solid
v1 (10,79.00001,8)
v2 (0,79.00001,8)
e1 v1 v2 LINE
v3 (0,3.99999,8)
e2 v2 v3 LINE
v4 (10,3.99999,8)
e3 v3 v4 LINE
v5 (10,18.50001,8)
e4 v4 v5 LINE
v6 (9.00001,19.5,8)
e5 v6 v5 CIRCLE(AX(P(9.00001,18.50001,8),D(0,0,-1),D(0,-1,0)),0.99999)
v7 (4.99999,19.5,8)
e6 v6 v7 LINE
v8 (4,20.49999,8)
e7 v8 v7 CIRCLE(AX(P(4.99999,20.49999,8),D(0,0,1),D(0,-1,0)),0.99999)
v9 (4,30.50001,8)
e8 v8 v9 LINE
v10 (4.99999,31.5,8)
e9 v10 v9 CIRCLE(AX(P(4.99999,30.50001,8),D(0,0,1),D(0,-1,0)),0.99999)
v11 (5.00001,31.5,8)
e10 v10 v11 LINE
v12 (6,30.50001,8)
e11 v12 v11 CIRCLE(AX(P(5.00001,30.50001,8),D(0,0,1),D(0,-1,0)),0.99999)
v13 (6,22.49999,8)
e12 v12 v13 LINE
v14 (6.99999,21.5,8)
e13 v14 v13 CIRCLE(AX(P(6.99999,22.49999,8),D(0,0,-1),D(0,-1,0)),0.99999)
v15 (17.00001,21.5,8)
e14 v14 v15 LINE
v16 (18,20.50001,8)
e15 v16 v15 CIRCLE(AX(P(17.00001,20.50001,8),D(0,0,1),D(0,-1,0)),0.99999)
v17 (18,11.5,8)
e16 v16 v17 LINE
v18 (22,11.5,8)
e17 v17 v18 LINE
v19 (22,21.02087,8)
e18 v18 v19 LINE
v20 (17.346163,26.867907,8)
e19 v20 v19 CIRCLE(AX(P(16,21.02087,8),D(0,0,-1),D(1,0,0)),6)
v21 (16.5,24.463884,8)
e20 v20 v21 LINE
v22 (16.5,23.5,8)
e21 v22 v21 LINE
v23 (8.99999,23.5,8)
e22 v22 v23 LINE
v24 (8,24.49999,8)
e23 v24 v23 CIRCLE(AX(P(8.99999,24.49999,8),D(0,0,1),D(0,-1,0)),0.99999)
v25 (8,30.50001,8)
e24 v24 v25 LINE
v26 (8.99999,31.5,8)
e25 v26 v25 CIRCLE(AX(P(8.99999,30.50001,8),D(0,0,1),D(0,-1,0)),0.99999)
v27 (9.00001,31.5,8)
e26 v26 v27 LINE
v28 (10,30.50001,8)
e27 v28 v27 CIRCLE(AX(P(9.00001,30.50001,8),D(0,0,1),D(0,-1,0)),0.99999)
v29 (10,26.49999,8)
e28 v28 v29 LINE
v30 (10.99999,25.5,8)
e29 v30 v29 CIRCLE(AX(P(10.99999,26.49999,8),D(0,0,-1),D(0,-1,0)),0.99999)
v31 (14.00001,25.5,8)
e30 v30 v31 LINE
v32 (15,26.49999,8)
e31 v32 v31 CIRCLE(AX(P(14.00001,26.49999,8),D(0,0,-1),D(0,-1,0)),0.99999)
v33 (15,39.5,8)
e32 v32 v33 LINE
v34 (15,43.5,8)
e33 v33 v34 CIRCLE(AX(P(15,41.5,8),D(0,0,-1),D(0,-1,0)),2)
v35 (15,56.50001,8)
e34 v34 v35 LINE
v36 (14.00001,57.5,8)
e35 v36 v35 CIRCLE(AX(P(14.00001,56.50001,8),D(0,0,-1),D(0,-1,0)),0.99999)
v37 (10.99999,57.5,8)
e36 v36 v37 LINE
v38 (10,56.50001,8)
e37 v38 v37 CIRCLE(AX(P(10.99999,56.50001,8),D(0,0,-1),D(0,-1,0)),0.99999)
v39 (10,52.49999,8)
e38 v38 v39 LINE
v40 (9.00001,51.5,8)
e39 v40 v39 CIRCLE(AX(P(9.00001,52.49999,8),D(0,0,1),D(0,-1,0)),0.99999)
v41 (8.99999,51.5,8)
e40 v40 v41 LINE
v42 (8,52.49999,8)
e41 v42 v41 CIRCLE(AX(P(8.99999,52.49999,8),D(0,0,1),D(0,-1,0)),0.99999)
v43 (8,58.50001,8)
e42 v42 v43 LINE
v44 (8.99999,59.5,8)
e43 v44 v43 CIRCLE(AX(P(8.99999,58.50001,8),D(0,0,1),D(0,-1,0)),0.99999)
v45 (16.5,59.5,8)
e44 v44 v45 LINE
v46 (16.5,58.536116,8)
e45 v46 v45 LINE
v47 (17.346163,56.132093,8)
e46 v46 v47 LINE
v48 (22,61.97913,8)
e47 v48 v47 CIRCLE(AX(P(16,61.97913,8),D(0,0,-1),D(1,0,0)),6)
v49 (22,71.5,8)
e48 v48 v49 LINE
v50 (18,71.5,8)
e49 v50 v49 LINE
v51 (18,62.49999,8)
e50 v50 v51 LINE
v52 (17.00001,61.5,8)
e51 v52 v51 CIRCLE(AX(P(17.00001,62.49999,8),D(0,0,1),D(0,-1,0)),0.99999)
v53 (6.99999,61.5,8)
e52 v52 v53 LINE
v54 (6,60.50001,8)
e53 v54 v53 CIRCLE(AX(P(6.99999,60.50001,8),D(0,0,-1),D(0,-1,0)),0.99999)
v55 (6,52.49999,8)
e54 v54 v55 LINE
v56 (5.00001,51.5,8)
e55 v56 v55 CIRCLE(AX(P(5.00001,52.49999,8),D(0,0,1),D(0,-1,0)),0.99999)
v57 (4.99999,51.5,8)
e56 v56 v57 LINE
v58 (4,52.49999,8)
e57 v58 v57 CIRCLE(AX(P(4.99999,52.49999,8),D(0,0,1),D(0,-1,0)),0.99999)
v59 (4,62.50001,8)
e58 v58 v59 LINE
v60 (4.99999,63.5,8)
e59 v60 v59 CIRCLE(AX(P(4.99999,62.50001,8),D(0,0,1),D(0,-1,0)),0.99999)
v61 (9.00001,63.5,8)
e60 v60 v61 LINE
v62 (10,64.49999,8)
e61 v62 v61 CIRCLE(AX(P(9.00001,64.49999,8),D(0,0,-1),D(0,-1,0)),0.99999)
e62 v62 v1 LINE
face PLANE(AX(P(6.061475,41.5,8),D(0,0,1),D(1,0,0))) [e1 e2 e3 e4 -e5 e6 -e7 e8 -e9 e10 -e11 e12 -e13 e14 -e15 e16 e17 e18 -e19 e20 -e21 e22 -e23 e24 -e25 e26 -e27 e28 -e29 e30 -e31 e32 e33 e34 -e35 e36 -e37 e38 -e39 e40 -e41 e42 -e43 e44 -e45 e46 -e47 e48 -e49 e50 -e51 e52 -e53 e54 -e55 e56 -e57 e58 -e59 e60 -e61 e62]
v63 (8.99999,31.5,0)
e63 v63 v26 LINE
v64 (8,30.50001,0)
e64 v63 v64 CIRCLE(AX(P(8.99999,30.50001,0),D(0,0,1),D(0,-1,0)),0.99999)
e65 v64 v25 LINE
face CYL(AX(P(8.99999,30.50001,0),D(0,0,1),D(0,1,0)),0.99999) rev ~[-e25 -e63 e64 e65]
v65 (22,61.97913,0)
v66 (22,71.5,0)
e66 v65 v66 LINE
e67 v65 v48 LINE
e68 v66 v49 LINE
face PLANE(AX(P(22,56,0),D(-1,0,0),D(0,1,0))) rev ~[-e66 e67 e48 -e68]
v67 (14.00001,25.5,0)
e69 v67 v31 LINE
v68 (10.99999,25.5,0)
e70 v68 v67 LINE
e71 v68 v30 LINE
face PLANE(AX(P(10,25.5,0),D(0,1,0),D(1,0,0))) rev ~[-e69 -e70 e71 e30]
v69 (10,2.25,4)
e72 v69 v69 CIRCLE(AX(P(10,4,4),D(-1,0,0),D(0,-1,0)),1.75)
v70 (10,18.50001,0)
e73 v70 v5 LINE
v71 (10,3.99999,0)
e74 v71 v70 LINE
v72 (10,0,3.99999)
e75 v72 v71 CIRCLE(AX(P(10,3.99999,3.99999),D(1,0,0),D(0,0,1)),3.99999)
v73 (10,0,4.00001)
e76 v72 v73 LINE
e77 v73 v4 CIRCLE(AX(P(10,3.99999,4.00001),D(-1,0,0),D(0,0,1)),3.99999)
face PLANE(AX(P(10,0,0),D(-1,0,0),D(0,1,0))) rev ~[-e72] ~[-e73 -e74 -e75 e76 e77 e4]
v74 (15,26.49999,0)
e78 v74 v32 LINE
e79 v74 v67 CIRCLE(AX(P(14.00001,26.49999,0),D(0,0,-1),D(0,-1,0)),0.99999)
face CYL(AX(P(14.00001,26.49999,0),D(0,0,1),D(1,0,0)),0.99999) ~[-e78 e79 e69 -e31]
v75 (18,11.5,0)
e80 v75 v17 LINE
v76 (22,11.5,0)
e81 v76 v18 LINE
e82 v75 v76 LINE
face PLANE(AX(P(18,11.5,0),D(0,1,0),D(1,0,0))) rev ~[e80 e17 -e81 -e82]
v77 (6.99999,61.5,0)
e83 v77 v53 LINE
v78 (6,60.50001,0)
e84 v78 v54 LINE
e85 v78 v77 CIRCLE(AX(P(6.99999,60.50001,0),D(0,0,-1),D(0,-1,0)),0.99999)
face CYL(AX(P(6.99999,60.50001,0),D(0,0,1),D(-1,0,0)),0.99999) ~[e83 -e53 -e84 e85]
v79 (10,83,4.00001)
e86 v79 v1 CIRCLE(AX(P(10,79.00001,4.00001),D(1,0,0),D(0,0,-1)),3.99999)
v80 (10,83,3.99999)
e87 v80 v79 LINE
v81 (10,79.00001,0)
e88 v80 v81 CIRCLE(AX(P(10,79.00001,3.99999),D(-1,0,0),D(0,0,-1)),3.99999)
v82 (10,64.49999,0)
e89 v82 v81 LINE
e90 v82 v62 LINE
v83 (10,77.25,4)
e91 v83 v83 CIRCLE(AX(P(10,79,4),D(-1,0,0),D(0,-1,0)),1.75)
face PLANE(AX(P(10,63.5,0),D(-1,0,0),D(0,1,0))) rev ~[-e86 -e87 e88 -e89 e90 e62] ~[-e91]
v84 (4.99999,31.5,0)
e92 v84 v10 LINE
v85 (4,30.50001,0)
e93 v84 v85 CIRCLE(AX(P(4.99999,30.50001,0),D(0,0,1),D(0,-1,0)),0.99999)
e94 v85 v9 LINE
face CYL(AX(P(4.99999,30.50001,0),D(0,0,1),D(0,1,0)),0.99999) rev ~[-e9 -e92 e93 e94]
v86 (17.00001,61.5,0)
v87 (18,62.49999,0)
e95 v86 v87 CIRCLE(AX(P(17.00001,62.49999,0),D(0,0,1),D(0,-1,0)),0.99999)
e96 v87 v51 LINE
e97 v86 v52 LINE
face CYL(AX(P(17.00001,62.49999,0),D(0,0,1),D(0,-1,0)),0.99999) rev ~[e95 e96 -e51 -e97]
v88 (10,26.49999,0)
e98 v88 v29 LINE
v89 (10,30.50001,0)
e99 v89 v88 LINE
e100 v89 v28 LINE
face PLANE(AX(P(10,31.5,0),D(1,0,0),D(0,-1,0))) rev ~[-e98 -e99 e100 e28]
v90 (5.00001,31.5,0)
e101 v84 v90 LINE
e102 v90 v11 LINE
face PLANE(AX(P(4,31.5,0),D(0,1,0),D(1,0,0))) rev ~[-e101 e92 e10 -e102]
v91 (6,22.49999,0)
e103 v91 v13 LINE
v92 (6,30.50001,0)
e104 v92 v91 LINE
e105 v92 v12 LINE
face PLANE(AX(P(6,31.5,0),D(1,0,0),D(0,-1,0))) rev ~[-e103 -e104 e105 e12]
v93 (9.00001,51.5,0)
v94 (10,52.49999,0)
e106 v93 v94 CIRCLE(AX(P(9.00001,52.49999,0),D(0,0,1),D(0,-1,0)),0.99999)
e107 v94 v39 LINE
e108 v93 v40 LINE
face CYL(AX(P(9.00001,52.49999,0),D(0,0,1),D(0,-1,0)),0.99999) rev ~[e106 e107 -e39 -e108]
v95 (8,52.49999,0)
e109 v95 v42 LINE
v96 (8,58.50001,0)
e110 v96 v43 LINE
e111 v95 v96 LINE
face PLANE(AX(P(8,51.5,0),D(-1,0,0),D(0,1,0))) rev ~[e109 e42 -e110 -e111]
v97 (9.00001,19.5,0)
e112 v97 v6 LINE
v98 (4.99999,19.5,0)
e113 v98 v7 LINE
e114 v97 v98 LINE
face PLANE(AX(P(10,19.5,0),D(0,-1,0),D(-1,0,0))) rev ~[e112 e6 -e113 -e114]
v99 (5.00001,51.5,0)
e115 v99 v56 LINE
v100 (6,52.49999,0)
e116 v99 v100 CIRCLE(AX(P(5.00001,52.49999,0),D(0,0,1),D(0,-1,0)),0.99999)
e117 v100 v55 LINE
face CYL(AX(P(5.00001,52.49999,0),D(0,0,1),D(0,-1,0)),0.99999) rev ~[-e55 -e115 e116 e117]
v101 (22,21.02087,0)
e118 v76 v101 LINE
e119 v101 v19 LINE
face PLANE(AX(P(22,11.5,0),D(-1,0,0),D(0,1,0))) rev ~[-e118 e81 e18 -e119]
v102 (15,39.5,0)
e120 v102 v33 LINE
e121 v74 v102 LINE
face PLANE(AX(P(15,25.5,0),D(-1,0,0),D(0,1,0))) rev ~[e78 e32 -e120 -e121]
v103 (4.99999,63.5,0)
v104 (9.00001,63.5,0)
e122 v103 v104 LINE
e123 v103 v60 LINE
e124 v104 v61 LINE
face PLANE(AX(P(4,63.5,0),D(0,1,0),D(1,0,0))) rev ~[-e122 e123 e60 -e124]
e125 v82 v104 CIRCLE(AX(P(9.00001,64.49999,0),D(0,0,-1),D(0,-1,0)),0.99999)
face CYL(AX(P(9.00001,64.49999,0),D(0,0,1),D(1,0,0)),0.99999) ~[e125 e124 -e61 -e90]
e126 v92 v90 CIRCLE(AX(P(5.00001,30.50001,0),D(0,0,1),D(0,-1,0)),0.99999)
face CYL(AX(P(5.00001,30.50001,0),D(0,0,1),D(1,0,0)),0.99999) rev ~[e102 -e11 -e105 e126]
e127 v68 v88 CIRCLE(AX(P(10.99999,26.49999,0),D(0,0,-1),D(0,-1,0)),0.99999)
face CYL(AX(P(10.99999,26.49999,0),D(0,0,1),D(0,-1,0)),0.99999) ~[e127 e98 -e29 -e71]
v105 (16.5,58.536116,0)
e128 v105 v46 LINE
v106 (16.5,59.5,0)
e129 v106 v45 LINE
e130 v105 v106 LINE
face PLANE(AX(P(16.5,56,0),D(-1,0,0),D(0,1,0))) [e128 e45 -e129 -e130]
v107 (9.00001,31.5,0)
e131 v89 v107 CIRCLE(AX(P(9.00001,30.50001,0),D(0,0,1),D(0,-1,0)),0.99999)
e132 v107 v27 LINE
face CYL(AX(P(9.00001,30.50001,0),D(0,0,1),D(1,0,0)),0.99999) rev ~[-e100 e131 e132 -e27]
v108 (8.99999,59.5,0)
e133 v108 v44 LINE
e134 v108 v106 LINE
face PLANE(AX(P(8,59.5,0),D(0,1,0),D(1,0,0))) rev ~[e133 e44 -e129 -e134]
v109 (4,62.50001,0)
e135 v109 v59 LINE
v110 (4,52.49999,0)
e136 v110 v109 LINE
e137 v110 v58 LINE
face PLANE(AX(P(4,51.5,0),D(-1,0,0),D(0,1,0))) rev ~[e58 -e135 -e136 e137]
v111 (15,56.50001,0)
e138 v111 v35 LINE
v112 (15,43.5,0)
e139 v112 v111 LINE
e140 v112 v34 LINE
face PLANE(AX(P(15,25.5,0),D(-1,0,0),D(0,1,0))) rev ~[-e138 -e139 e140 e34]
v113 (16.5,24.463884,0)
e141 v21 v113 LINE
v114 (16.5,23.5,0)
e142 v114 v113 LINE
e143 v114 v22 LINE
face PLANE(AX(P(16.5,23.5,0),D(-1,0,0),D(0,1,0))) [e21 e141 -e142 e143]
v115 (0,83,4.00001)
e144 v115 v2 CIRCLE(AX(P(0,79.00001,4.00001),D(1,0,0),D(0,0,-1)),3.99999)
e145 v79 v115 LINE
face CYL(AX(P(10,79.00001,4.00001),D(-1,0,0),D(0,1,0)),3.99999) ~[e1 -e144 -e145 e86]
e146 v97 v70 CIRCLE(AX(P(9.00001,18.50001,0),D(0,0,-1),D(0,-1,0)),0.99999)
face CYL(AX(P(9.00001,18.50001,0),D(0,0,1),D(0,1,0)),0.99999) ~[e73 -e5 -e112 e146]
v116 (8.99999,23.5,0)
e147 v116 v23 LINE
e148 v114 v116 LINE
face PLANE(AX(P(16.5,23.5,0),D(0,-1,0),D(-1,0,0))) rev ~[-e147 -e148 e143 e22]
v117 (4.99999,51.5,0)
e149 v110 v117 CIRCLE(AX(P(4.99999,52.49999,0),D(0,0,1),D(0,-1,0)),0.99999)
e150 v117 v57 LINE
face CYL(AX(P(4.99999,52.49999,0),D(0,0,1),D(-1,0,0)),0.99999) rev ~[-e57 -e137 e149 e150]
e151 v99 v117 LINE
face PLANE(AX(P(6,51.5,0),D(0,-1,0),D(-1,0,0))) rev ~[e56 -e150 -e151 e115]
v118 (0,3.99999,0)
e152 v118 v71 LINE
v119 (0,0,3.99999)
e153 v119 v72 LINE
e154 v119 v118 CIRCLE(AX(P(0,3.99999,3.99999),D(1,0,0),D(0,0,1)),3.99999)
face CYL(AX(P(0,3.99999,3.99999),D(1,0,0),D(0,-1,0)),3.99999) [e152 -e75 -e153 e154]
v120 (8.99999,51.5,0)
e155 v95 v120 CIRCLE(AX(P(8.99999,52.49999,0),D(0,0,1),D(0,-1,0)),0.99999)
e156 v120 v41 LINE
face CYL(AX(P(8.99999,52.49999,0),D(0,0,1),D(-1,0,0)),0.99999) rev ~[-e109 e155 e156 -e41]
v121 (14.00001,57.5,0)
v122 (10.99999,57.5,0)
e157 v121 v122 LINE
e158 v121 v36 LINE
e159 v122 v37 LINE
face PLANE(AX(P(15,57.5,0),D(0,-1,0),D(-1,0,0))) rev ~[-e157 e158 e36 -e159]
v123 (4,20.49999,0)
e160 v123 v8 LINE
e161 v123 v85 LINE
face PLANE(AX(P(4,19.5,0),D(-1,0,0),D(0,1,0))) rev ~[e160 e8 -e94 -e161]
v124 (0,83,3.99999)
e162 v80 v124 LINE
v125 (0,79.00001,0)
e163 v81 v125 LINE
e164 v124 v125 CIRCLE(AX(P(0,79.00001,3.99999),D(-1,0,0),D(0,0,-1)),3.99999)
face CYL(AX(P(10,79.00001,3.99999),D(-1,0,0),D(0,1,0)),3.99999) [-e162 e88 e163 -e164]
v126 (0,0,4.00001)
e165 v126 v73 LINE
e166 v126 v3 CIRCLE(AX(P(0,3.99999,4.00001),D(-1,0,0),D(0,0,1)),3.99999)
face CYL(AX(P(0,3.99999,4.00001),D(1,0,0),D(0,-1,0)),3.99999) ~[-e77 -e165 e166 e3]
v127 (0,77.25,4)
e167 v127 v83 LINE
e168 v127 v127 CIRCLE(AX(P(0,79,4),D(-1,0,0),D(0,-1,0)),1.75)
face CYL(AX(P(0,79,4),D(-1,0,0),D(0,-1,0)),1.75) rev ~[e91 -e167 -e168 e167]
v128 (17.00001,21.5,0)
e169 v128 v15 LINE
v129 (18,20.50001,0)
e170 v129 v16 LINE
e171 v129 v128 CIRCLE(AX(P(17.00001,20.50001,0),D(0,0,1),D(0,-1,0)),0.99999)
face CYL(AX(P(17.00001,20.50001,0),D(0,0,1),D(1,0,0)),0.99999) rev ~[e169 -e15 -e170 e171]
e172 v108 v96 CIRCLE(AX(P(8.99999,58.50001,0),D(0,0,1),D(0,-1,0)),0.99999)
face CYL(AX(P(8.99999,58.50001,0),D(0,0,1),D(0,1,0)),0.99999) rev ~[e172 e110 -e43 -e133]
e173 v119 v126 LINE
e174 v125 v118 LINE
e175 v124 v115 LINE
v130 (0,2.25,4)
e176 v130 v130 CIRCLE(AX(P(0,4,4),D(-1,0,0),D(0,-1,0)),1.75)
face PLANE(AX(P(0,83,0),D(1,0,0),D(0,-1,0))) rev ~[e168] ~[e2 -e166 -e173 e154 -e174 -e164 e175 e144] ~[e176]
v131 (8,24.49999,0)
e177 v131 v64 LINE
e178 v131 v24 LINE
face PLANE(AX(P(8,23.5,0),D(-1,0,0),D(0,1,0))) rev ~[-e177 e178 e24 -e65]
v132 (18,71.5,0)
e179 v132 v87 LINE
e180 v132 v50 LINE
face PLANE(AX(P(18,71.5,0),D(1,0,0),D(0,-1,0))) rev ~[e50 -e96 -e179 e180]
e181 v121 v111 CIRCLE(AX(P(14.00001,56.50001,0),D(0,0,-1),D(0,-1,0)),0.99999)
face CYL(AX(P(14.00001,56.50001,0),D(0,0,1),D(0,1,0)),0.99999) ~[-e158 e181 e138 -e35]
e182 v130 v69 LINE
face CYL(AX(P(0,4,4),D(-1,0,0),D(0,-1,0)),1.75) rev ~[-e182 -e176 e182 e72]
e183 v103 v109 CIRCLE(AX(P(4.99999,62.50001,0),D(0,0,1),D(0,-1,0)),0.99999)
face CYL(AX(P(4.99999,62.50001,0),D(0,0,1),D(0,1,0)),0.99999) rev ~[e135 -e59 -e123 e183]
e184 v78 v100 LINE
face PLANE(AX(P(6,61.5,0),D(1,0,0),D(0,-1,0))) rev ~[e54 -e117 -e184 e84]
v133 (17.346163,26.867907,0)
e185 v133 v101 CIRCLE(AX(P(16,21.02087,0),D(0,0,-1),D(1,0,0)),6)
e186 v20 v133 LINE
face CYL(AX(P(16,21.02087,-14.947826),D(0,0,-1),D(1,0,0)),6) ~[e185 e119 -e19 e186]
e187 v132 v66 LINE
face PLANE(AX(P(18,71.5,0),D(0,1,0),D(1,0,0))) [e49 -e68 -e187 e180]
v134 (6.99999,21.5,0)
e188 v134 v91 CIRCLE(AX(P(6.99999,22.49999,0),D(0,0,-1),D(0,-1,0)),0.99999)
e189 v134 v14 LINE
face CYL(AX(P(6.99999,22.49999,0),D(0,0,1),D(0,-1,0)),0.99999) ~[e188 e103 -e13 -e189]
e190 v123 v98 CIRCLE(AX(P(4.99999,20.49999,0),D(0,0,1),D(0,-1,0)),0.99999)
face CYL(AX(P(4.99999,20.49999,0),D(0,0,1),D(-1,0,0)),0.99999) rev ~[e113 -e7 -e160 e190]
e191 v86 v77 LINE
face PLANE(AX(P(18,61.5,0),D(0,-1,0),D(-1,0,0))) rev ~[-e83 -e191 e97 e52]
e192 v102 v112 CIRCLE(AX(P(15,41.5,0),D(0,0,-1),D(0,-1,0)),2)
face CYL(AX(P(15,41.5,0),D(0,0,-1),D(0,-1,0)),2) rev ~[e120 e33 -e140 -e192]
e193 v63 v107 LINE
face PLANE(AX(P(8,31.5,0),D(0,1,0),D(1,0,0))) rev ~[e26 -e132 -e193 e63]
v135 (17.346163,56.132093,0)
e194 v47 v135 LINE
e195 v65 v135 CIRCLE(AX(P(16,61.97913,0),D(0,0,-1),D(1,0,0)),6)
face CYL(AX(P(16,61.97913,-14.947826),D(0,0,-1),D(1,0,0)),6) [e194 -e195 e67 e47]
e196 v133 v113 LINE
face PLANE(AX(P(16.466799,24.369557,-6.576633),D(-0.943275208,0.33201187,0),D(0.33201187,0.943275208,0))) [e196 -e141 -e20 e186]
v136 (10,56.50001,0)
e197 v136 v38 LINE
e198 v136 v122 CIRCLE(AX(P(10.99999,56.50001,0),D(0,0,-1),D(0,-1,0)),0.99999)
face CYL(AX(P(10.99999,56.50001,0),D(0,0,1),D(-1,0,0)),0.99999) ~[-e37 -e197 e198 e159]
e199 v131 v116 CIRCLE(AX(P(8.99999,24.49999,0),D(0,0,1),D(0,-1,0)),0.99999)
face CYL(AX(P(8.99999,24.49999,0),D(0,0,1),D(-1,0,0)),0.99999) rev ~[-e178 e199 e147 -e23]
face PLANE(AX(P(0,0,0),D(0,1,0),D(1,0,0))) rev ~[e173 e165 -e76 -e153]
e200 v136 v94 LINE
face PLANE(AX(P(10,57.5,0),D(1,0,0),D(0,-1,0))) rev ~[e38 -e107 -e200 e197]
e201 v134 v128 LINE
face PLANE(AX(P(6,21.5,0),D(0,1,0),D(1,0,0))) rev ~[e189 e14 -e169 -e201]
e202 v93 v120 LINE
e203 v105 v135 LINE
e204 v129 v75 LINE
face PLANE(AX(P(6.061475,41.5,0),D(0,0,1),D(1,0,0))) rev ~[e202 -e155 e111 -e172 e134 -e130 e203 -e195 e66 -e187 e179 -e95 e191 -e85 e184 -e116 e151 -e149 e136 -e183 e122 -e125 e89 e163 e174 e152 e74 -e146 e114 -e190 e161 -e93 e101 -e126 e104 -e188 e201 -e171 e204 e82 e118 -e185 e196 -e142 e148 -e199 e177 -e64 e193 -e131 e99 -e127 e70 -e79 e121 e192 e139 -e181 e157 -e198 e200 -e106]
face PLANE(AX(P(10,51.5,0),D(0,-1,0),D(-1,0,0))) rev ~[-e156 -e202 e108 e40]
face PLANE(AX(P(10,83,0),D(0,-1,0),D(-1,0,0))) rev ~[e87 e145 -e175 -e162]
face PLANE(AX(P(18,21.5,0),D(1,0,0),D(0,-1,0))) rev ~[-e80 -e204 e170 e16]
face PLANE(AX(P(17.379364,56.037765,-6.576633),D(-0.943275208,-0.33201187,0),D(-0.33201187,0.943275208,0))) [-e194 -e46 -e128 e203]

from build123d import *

# Parameters (mm, degrees)
F0_W        = 4
F0_H        = 8
F0_H_2      = 2
F0_W_2      = 5.5
F0_H_3      = 3.5
F1_DEPTH    = 8
F2_R        = 3.99999
F3_T1_DEPTH = 37.8956518578
F4_T1_DEPTH = 21.1532650868
F5_T1_DEPTH = 21.1532650868
F7_DEPTH    = 8
F8_R        = 0.99999
F9_R        = 1.75
F10_DEPTH   = 10


# Not quite as in the source:
# - a fillet or chamfer that OpenCascade refuses, or shapes differently, is made with other operations: its cross-section is extruded or revolved along the edge and cut away or added
# - a fillet or chamfer is up to 0.001 mm smaller than in the source, because OpenCascade refuses the exact size


with BuildPart() as f1:
    # F0 (on Top) → F1 (new body)
    with BuildSketch(Plane.XY):
        Polygon((0, 83), (0, 0), (10, 0), (10, 10), (10, 19.5), (8, 19.5), (4, 19.5), (4, 31.5), (6, 31.5), (8, 31.5), (10, 31.5), (10, 25.5), (15, 25.5), (15, 57.5), (10, 57.5), (10, 51.5), (8, 51.5), (6, 51.5), (4, 51.5), (4, 63.5), (8, 63.5), (10, 63.5), (10, 73), (10, 83), align=None)
        with Locations((20, 67.5)):
            Rectangle(F0_W, F0_H)
        with Locations((20, 62.5)):
            Rectangle(F0_W, F0_H_2)
        with Locations((19.25, 57.75)):
            Rectangle(F0_W_2, F0_H_3)
        with Locations((19.25, 25.25)):
            Rectangle(F0_W_2, F0_H_3)
        with Locations((20, 20.5)):
            Rectangle(F0_W, F0_H_2)
        with Locations((20, 15.5)):
            Rectangle(F0_W, F0_H)
        Polygon((8, 23.5), (8, 21.5), (18, 21.5), (22, 21.5), (22, 23.5), (16.5, 23.5), (15, 23.5), align=None)
        Polygon((6, 21.5), (8, 21.5), (8, 23.5), (8, 25.5), (8, 31.5), (6, 31.5), align=None)
        Polygon((8, 59.5), (8, 61.5), (6, 61.5), (6, 51.5), (8, 51.5), (8, 57.5), align=None)
        Polygon((18, 61.5), (8, 61.5), (8, 59.5), (15, 59.5), (16.5, 59.5), (22, 59.5), (22, 61.5), align=None)
    extrude(amount=F1_DEPTH)

    # F2 (radius 4 in the source; OpenCascade refuses exactly that, so slightly less here)
    f2_edges = [f1.edges().sort_by_distance(p)[0] for p in [
        (5, 83, 8),
        (5, 0, 8),
        (5, 0, 0),
        (5, 83, 0),
    ]]
    fillet(f2_edges, radius=F2_R)

    # F3: fillet of radius 6 on 2 edges, made by hand

    # F3_s2 → F3_t1 (cut)
    with BuildSketch(Plane.XY.offset(-14.9478259289)):
        with BuildLine():
            ThreePointArc((22, 61.9791303716), (20.4158804332, 57.9171111692), (16.5, 56))
            Line((16.5, 56), (22, 56))
            Line((22, 56), (22, 61.9791303716))
        make_face()
        with BuildLine():
            ThreePointArc((22, 21.0208696284), (20.4158804332, 25.0828888308), (16.5, 27))
            Line((16.5, 27), (22, 27))
            Line((22, 27), (22, 21.0208696284))
        make_face()
    extrude(amount=F3_T1_DEPTH, mode=Mode.SUBTRACT)

    # F4: chamfer of 0.5 x 2.5 on 1 edges, made by hand

    # F4_s2 → F4_t1 (cut)
    with BuildSketch(Plane.XY.offset(-6.5766325434)):
        with BuildLine():
            Line((17.379363756, 56.0377654524), (16.466798813, 58.6304434947))
            Line((16.466798813, 58.6304434947), (16.416798813, 58.6304434947))
            ThreePointArc((16.416798813, 58.6304434947), (16.45, 57.3152217474), (16.45, 56))
            Line((16.45, 56), (16.5041666667, 55.9501739136))
            ThreePointArc((16.5041666667, 55.9501739136), (16.9421943049, 56.0029468158), (17.3905817774, 55.9890401407))
            Line((17.3905817774, 55.9890401407), (17.379363756, 56.0377654524))
        make_face()
    extrude(amount=F4_T1_DEPTH, mode=Mode.SUBTRACT)

    # F5: chamfer of 0.5 x 2.5 on 1 edges, made by hand

    # F5_s2 → F5_t1 (cut)
    with BuildSketch(Plane.XY.offset(-6.5766325434)):
        with BuildLine():
            Line((16.466798813, 24.3695565053), (17.379363756, 26.9622345476))
            Line((17.379363756, 26.9622345476), (17.3905817774, 27.0109598593))
            ThreePointArc((17.3905817774, 27.0109598593), (16.9421943049, 26.9970531842), (16.5041666667, 27.0498260864))
            Line((16.5041666667, 27.0498260864), (16.45, 27))
            ThreePointArc((16.45, 27), (16.45, 25.6847782526), (16.416798813, 24.3695565053))
            Line((16.416798813, 24.3695565053), (16.466798813, 24.3695565053))
        make_face()
    extrude(amount=F5_T1_DEPTH, mode=Mode.SUBTRACT)

    # F6 (on face) → F7 (cut)
    with BuildSketch(Plane(origin=(0, 0, 0), x_dir=(1, 0, 0), z_dir=(0, 0, -1))):
        with BuildLine():
            Line((15, -43.5), (15, -39.5))
            ThreePointArc((15, -39.5), (13, -41.5), (15, -43.5))
        make_face()
    extrude(amount=-F7_DEPTH, mode=Mode.SUBTRACT)

    # F8 (radius 1 in the source; OpenCascade refuses exactly that, so slightly less here)
    f8_edges = [f1.edges().sort_by_distance(p)[0] for p in [
        (18, 21.5, 4),
        (6, 21.5, 4),
        (4, 19.5, 4),
        (10, 19.5, 4),
        (8, 23.5, 4),
        (15, 25.5, 4),
        (10, 25.5, 4),
        (8, 31.5, 4),
        (10, 31.5, 4),
        (6, 31.5, 4),
        (4, 31.5, 4),
        (6, 51.5, 4),
        (10, 51.5, 4),
        (18, 61.5, 4),
        (6, 61.5, 4),
        (10, 57.5, 4),
        (15, 57.5, 4),
        (8, 59.5, 4),
        (4, 51.5, 4),
        (8, 51.5, 4),
        (4, 63.5, 4),
        (10, 63.5, 4),
    ]]
    fillet(f8_edges, radius=F8_R)

    # F9 (on face) → F10 (cut)
    with BuildSketch(Plane(origin=(0, 0, 0), x_dir=(0, -1, 0), z_dir=(-1, 0, 0))):
        with Locations((-79, 4)):
            Circle(F9_R)
        with Locations((-4, 4)):
            Circle(F9_R)
    extrude(amount=-F10_DEPTH, mode=Mode.SUBTRACT)


solid = f1.part
